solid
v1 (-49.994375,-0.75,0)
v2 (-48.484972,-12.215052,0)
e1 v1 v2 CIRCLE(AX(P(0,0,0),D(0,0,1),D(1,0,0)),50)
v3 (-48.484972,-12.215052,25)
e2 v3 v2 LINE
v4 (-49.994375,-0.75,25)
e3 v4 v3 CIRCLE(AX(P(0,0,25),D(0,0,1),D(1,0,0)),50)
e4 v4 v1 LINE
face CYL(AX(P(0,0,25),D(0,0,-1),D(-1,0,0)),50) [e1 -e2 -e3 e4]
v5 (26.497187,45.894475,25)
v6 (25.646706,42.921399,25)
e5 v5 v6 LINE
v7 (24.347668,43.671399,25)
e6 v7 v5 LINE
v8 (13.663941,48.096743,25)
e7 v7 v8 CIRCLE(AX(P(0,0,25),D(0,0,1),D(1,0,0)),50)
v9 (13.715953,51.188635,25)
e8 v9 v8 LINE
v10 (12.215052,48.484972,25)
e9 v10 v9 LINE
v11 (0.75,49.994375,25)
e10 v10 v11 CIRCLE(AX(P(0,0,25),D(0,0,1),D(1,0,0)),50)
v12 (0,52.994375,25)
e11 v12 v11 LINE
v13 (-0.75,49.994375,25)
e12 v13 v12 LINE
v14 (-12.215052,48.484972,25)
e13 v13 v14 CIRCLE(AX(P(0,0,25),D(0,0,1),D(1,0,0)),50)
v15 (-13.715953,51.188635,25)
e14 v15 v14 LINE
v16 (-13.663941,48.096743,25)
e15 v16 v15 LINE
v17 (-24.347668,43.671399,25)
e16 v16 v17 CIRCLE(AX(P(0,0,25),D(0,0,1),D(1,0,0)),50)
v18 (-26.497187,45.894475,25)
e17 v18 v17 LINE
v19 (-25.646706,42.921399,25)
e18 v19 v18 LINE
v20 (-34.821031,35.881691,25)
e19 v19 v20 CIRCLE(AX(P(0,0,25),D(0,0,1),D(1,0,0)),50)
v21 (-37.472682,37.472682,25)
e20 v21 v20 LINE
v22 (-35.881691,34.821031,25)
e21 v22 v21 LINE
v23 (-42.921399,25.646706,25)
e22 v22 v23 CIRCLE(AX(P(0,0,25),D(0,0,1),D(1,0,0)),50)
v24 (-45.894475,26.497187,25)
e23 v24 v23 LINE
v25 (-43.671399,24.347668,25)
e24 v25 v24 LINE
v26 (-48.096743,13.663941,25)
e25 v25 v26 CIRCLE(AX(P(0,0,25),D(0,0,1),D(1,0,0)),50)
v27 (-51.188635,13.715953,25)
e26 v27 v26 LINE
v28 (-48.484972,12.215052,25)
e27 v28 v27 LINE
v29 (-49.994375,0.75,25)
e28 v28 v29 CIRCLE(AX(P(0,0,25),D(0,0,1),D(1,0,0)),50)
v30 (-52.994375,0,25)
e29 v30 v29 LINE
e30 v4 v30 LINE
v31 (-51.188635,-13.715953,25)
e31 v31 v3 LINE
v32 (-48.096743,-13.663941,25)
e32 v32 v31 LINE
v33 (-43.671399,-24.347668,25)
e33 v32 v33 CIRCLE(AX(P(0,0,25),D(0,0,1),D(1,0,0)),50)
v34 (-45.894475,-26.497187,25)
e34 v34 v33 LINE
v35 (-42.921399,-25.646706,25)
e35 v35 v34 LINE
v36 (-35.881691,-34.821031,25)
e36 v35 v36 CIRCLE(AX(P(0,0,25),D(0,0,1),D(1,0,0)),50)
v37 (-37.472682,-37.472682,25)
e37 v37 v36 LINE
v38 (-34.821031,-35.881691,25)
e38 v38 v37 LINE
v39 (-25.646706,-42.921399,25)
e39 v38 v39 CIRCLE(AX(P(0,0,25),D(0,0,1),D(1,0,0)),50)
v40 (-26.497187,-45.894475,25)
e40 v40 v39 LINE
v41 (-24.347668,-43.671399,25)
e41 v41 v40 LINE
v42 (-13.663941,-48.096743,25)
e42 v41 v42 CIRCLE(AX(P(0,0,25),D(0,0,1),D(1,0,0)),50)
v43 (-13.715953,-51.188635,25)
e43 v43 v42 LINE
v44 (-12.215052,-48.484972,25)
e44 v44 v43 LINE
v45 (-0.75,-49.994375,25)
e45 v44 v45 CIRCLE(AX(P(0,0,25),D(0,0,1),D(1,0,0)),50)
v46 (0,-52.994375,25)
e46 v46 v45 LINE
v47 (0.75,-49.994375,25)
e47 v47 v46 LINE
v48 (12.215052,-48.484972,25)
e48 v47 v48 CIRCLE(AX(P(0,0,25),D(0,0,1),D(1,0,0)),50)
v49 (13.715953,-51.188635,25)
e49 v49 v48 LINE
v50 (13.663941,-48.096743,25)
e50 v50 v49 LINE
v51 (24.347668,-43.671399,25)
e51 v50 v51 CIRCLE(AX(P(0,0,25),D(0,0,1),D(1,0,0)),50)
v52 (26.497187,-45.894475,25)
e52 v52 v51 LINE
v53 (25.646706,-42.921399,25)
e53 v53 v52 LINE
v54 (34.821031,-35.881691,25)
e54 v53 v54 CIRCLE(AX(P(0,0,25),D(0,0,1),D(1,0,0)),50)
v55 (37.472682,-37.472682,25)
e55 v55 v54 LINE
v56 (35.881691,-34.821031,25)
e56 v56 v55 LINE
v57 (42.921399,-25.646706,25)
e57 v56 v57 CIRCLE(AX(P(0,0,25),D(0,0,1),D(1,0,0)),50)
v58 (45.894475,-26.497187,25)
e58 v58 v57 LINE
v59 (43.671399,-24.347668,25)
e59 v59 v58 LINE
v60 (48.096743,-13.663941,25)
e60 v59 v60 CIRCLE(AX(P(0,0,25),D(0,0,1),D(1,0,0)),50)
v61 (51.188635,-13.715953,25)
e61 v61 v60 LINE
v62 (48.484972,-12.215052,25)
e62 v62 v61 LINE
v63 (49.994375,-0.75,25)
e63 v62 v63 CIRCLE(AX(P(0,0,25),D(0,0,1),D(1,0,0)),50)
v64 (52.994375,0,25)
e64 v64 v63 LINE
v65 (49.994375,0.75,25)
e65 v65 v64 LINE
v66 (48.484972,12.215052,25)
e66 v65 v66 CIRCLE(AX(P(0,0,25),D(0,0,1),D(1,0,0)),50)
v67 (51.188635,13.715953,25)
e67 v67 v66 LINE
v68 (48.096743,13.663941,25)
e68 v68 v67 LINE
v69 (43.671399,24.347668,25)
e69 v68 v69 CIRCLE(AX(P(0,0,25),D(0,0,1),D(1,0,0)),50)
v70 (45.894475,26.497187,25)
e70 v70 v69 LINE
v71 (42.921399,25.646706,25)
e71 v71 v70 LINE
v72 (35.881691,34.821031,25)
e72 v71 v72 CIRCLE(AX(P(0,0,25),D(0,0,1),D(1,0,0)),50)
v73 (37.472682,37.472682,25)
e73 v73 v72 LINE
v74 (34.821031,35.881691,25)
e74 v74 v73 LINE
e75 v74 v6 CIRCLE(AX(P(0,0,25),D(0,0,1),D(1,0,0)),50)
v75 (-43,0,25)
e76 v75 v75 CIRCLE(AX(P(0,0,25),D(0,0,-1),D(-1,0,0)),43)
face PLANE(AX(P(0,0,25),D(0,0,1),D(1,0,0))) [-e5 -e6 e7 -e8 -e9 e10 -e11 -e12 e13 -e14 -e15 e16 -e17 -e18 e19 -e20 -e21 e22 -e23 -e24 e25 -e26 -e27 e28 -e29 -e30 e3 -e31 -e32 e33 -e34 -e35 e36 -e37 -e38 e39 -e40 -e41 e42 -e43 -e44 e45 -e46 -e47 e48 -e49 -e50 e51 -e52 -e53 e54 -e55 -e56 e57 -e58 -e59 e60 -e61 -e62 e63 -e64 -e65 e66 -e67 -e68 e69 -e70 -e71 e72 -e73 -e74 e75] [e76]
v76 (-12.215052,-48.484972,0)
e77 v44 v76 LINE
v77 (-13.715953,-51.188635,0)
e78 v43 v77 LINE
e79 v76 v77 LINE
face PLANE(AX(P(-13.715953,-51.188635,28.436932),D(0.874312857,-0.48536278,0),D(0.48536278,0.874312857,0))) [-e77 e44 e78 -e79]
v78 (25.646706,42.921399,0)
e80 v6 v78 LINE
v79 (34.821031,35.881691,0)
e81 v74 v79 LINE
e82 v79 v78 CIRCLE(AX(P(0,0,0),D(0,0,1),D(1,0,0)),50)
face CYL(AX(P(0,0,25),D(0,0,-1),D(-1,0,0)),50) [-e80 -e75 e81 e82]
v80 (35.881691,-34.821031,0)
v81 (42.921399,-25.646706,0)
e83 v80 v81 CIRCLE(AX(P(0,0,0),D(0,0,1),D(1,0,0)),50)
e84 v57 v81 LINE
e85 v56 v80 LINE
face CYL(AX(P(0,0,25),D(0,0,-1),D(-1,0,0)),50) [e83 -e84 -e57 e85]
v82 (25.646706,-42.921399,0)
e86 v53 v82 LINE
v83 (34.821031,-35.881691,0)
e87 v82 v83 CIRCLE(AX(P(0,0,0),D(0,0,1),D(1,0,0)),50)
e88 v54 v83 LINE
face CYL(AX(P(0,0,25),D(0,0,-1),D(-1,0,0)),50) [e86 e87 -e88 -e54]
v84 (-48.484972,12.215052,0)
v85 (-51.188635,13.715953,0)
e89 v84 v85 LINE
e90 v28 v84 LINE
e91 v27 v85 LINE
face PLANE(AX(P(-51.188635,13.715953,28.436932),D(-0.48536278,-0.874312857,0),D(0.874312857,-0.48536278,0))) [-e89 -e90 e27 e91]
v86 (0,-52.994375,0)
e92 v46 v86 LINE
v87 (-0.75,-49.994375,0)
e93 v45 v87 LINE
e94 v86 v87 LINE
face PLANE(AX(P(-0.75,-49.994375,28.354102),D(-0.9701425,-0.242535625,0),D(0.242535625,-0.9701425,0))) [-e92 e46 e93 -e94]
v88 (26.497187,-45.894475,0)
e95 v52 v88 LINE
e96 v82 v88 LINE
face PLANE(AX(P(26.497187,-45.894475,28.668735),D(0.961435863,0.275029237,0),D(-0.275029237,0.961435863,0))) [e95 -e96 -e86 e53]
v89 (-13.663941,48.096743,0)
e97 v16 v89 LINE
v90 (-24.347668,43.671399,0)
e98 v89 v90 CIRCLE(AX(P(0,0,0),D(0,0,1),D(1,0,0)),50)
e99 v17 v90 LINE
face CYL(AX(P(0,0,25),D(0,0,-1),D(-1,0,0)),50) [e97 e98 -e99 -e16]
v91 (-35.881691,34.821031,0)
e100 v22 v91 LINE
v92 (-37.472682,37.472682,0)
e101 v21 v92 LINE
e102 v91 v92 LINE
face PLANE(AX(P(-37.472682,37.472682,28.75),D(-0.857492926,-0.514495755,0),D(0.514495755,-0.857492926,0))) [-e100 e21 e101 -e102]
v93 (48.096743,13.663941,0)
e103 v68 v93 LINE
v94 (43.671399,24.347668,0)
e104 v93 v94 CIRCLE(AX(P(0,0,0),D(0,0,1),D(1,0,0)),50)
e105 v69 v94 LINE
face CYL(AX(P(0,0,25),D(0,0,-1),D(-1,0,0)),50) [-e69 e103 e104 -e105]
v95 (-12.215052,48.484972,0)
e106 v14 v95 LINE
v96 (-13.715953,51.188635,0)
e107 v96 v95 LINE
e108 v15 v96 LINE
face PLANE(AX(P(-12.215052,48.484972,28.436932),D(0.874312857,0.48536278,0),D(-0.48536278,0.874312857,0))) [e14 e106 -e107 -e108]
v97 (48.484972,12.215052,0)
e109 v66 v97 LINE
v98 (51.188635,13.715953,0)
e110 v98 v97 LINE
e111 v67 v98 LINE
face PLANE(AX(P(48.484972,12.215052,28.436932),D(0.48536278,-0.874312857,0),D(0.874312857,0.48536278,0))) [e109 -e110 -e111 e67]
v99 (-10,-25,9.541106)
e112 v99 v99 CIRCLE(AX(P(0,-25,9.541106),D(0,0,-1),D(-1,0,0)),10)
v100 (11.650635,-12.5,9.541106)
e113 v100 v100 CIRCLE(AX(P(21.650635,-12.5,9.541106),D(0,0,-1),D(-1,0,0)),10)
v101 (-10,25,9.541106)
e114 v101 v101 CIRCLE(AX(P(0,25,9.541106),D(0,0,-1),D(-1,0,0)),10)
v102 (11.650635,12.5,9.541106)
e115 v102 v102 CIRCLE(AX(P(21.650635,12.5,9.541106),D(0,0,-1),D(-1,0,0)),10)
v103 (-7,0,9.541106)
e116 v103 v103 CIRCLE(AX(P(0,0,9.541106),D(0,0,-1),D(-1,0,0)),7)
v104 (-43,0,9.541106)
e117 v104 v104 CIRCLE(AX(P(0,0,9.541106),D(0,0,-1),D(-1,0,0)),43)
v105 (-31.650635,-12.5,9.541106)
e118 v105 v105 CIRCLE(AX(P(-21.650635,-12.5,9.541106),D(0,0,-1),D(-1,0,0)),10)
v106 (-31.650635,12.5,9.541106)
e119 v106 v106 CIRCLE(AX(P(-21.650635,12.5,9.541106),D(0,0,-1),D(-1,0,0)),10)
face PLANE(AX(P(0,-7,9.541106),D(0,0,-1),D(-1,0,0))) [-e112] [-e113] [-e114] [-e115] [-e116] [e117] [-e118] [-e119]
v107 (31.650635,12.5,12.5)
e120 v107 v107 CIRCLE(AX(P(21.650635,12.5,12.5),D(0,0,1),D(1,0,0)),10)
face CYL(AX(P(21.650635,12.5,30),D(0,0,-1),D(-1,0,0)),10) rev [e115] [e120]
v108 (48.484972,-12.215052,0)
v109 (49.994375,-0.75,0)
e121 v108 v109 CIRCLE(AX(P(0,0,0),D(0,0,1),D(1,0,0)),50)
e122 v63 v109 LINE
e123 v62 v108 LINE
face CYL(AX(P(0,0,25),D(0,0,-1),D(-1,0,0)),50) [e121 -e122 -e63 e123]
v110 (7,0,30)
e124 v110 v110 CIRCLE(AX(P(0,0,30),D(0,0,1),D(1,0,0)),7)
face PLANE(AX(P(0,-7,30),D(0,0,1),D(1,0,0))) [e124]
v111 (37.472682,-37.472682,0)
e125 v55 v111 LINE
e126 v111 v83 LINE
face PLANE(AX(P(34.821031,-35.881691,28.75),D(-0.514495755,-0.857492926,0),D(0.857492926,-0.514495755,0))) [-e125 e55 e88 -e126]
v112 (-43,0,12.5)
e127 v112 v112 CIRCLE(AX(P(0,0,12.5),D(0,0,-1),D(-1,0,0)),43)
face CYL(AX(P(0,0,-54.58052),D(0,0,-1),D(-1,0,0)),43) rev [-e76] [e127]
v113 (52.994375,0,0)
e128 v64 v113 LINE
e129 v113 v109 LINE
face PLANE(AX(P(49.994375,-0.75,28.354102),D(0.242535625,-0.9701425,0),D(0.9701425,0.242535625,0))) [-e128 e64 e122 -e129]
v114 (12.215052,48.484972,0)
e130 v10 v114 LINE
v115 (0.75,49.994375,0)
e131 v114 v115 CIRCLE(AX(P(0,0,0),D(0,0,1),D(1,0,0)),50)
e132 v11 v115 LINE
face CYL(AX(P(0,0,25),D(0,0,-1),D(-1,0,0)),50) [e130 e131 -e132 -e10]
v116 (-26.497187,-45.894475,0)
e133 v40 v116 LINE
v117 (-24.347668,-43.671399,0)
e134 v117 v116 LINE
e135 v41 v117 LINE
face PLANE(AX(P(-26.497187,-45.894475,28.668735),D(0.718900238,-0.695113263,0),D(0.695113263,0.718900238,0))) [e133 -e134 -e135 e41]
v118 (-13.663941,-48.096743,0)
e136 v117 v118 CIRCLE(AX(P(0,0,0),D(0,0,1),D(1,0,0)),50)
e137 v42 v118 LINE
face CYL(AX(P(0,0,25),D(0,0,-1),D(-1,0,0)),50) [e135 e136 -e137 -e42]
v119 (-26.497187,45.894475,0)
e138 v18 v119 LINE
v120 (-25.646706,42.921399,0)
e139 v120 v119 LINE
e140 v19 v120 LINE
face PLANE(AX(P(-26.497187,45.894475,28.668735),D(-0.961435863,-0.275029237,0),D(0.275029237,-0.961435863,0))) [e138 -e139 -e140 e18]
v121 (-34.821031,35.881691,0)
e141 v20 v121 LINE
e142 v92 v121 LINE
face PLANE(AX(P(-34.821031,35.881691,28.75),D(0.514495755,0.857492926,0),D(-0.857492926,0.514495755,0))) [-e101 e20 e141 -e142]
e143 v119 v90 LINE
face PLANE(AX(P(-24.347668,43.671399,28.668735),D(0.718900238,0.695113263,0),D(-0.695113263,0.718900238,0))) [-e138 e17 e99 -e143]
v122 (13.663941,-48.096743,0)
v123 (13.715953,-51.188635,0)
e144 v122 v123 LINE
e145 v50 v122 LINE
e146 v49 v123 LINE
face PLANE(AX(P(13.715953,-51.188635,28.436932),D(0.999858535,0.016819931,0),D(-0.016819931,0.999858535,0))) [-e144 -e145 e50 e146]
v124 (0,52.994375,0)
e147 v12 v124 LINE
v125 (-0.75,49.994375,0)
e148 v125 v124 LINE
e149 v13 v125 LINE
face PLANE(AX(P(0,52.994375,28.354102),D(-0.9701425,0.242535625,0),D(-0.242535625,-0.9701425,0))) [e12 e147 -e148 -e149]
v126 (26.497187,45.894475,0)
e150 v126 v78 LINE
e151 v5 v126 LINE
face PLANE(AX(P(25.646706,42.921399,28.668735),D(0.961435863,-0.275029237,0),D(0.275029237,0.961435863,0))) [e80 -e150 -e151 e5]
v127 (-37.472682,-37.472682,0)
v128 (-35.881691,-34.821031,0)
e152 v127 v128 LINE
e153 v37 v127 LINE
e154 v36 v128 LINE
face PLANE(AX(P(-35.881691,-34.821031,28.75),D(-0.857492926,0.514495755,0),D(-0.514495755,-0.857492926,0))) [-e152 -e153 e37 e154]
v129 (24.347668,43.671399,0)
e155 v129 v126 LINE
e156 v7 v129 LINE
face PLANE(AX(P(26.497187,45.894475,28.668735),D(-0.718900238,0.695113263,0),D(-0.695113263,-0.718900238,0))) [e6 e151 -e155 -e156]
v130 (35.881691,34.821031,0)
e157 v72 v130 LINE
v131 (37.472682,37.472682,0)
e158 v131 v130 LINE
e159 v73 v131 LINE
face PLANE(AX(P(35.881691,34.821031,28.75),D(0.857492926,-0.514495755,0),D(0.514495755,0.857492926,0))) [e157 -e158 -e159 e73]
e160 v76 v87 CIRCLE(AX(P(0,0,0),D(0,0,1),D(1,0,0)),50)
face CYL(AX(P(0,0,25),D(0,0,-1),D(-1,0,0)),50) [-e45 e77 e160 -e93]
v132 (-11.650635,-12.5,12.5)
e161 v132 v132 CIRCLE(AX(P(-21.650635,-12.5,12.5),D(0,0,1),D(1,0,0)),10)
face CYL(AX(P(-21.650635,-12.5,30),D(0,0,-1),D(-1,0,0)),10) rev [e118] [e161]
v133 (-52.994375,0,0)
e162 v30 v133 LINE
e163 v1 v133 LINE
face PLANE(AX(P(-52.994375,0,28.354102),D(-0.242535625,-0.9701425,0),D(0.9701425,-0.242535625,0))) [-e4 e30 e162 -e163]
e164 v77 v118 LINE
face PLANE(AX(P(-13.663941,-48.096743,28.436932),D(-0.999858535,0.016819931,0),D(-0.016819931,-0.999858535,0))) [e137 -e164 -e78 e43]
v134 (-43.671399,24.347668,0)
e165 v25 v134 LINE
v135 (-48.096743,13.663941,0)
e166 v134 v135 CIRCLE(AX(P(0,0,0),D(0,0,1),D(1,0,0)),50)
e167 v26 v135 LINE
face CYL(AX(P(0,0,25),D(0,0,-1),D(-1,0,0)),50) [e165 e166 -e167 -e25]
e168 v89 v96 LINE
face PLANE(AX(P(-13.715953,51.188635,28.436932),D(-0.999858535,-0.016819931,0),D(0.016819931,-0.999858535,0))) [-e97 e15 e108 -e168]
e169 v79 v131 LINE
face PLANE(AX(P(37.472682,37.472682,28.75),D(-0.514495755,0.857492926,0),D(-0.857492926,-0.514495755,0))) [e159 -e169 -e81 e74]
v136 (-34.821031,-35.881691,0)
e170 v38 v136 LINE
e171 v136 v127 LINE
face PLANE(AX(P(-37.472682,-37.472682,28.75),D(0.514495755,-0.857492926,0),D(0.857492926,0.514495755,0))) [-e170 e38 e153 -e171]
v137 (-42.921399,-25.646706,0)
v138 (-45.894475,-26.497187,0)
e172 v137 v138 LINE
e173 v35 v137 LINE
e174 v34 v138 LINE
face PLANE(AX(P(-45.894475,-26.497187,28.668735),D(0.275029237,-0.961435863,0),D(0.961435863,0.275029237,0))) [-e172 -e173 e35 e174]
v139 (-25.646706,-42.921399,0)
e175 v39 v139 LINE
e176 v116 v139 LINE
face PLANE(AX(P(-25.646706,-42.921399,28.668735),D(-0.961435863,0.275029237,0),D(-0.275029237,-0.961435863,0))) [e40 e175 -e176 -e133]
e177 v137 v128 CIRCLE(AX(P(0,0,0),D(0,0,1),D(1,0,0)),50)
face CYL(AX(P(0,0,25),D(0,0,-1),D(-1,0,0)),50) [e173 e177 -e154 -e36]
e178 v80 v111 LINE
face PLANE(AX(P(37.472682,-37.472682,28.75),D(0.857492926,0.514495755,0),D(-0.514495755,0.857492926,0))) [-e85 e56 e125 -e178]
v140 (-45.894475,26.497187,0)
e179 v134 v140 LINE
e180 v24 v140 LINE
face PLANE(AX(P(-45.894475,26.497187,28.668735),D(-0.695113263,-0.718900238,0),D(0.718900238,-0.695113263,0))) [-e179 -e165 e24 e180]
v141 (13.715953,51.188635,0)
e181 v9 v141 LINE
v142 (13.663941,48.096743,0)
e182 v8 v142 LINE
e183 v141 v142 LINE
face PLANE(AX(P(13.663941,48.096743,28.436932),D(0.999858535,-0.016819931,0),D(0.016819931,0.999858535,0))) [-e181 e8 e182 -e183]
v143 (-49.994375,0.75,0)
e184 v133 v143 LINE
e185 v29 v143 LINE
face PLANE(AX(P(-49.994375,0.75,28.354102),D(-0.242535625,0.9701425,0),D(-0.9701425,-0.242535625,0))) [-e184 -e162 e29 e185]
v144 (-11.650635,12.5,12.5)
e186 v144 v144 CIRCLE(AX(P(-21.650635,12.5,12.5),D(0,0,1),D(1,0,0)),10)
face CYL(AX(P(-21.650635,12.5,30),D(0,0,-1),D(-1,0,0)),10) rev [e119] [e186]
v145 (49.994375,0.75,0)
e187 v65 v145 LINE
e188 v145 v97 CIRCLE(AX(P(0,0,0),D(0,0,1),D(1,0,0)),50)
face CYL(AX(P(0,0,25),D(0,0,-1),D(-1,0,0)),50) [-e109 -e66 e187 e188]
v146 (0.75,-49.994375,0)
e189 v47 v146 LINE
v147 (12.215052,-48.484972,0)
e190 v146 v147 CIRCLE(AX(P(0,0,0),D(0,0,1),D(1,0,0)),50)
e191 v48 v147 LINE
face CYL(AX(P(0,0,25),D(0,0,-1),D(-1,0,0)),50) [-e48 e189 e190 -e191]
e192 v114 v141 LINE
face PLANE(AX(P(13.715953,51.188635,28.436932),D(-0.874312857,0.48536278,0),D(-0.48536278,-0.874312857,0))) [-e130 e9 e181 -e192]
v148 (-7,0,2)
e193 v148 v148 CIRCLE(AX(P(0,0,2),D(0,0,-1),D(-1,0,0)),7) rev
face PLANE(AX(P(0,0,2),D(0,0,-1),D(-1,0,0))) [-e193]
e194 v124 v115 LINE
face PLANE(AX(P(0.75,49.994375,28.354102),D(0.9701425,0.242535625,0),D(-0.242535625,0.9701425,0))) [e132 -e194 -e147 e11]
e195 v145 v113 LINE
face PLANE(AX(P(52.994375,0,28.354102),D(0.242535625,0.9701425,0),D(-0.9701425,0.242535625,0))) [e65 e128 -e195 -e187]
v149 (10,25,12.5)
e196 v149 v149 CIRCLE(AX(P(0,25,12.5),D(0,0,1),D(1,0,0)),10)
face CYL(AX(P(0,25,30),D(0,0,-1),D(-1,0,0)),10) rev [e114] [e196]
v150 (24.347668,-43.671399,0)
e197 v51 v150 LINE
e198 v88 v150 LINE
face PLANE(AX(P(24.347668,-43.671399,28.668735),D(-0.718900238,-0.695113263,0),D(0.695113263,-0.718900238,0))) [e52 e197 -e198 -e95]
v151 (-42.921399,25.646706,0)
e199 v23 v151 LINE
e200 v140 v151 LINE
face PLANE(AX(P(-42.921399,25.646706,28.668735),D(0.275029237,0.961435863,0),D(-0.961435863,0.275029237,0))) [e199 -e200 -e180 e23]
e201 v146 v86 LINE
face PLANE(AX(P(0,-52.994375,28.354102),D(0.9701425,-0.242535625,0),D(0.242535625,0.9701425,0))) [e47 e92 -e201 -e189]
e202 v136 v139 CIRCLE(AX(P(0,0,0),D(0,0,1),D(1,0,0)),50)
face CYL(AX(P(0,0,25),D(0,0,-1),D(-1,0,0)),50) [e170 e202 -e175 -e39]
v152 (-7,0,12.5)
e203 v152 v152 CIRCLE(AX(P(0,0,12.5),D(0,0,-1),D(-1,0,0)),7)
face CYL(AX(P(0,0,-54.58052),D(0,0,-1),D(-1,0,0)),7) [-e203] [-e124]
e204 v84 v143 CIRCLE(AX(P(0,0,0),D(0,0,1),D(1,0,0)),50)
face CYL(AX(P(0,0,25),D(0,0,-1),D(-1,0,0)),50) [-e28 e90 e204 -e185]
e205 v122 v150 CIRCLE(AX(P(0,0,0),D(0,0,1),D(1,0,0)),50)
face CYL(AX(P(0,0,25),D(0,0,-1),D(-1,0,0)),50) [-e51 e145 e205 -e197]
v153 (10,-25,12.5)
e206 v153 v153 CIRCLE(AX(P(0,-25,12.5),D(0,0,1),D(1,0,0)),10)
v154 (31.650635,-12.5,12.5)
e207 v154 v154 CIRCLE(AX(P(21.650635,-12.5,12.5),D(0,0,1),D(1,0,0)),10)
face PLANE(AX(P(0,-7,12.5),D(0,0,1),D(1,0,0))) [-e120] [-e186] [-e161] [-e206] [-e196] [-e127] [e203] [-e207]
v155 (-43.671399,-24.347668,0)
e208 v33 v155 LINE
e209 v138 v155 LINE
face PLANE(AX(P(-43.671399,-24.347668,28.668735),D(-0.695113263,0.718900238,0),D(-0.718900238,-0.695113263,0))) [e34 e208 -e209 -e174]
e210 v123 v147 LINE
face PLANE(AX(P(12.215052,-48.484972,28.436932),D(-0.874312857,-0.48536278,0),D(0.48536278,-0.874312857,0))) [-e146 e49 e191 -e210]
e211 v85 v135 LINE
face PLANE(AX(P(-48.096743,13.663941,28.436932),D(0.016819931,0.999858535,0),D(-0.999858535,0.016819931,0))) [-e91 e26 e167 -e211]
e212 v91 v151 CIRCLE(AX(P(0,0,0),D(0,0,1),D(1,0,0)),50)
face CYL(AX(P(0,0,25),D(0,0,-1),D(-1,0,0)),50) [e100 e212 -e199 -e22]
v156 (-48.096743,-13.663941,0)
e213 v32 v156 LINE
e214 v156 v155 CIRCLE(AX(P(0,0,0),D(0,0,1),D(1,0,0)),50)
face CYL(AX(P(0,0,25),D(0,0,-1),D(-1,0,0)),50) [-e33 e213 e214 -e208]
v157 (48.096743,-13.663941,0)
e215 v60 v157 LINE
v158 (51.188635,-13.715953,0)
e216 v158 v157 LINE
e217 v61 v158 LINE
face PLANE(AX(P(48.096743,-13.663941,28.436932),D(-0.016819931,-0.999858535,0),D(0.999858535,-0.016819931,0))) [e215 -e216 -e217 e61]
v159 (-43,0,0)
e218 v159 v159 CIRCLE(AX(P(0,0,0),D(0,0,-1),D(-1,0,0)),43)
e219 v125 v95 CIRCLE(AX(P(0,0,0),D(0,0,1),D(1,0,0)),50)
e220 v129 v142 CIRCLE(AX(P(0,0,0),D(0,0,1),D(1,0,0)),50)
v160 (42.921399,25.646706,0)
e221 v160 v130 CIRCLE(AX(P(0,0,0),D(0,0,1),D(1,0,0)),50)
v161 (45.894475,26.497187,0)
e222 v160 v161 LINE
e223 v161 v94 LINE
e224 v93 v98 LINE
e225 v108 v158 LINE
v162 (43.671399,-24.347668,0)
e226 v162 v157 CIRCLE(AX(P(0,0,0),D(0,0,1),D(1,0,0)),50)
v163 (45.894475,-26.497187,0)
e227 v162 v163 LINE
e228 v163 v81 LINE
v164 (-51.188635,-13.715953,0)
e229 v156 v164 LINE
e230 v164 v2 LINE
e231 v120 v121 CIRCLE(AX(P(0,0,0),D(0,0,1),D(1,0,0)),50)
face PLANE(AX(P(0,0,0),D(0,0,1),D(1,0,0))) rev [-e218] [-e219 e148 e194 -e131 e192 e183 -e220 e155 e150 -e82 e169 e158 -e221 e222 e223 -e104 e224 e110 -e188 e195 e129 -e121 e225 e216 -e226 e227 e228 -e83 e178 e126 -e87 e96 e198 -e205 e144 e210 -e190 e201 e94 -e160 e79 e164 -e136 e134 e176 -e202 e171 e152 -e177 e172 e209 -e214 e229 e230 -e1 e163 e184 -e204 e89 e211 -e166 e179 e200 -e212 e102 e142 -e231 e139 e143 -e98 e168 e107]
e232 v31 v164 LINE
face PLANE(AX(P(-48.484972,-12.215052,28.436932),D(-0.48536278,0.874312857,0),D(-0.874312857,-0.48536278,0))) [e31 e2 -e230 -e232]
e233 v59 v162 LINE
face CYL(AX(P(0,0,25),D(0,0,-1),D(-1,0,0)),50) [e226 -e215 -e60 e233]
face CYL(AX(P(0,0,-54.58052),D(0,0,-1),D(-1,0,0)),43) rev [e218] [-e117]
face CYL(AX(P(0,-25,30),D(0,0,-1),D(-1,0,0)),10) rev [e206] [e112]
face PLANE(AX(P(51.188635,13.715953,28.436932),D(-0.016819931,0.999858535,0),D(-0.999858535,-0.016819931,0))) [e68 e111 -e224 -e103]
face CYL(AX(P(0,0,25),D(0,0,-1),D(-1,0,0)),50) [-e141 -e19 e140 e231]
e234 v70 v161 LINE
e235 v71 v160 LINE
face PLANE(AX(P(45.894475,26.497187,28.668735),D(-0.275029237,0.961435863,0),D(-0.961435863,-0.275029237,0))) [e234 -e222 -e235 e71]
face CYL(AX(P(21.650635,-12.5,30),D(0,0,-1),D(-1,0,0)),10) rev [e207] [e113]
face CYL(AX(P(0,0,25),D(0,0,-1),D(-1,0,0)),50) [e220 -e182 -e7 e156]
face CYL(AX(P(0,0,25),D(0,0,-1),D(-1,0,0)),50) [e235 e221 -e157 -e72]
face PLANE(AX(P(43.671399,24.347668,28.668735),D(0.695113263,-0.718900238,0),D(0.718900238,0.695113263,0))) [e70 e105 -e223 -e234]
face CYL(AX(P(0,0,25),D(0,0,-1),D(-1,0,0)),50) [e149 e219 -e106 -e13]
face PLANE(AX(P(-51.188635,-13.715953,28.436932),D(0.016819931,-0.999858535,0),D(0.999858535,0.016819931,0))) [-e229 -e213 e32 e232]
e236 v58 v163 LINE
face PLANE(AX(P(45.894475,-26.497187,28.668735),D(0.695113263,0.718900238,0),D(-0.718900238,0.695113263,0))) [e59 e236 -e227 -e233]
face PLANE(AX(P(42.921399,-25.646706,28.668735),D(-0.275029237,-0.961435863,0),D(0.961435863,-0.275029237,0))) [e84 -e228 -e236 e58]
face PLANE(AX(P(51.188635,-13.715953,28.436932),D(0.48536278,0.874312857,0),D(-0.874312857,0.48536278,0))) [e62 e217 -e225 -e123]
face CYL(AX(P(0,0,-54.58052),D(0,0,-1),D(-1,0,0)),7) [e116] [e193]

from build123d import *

# Parameters (mm, degrees)
SKETCH1_R           = 50
BOSS_EXTRUDE1_DEPTH = 25
SKETCH2_W           = 9.541105513
SKETCH2_H           = 36
SKETCH2_W_2         = 12.5
SKETCH2_4_W         = 9.541105513
SKETCH2_4_H         = 36
SKETCH2_4_W_2       = 12.5
SKETCH5_W           = 5
SKETCH5_H           = 7
SKETCH6_W           = 2
SKETCH6_H           = 9
SKETCH7_R           = 10
CUT_EXTRUDE1_DEPTH  = 74.610911988
BOSS_EXTRUDE2_DEPTH = 25
CIRPATTERN1_DEPTH   = 25


# Read off the part's stored shape, not the designer's step: CirPattern1
with BuildPart() as part:
    # Sketch1 → Boss-Extrude1 (new body)
    with BuildSketch(Plane.XY):
        Circle(SKETCH1_R)
    extrude(amount=BOSS_EXTRUDE1_DEPTH)

    # Sketch2 → Revolve1 (revolve)
    with BuildSketch(Plane(origin=(0, 0, 0), x_dir=(0, 0, -1), z_dir=(1, 0, 0))):
        with Locations((-4.770552756, -25)):
            Rectangle(SKETCH2_W, SKETCH2_H)
        with Locations((-18.75, -25)):
            Rectangle(SKETCH2_W_2, SKETCH2_H)
    revolve(axis=Axis((0, 0, -54.580519766), (0, 0, 1)))

    # Sketch2<4> → Cut-Revolve1 (revolve, cut)
    with BuildSketch(Plane(origin=(0, 0, 0), x_dir=(0, 0, -1), z_dir=(1, 0, 0)), mode=Mode.PRIVATE) as cut_revolve1_sk:
        with Locations((-4.770552756, -25)):
            Rectangle(SKETCH2_4_W, SKETCH2_4_H)
        with Locations((-18.75, -25)):
            Rectangle(SKETCH2_4_W_2, SKETCH2_4_H)
    revolve(cut_revolve1_sk.sketch.rotate(Axis((0, 0, -54.580519766), (0, 0, 1)), 270), axis=Axis((0, 0, -54.580519766), (0, 0, 1)), mode=Mode.SUBTRACT)

    # Sketch5 → Revolve3 (revolve)
    with BuildSketch(Plane(origin=(0, 0, 0), x_dir=(0, 0, -1), z_dir=(1, 0, 0)), mode=Mode.PRIVATE) as revolve3_sk:
        with Locations((-27.5, -3.5)):
            Rectangle(SKETCH5_W, SKETCH5_H)
    revolve(revolve3_sk.sketch.rotate(Axis((0, 0, 64.707463348), (0, 0, -1)), 90), axis=Axis((0, 0, 64.707463348), (0, 0, -1)))

    # Sketch6 → Cut-Revolve2 (revolve, cut)
    with BuildSketch(Plane(origin=(0, 0, 0), x_dir=(0, 0, -1), z_dir=(1, 0, 0)), mode=Mode.PRIVATE) as cut_revolve2_sk:
        with Locations((-1, -4.5)):
            Rectangle(SKETCH6_W, SKETCH6_H)
    revolve(cut_revolve2_sk.sketch.rotate(Axis((0, 0, -41.001610393), (0, 0, 1)), 270), axis=Axis((0, 0, -41.001610393), (0, 0, 1)), mode=Mode.SUBTRACT)

    # Sketch7 → Cut-Extrude1 (cut, through all)
    with BuildSketch(Plane(origin=(0, 0, 9.541105513), x_dir=(-1, 0, 0), z_dir=(0, 0, -1))):
        with Locations((0, 25)):
            Circle(SKETCH7_R)
        with Locations((21.650635095, 12.5)):
            Circle(SKETCH7_R)
        with Locations((21.650635095, -12.5)):
            Circle(SKETCH7_R)
        with Locations((0, -25)):
            Circle(SKETCH7_R)
        with Locations((-21.650635095, -12.5)):
            Circle(SKETCH7_R)
        with Locations((-21.650635095, 12.5)):
            Circle(SKETCH7_R)
    extrude(amount=-CUT_EXTRUDE1_DEPTH, mode=Mode.SUBTRACT)

    # Sketch8 → Boss-Extrude2 (add)
    with BuildSketch(Plane(origin=(0, 0, 0), x_dir=(-1, 0, 0), z_dir=(0, 0, -1))):
        with BuildLine():
            Line((-0.75, 49.994374684), (0, 52.994374684))
            Line((0, 52.994374684), (0.75, 49.994374684))
            ThreePointArc((0.75, 49.994374684), (0, 50), (-0.75, 49.994374684))
        make_face()
    extrude(amount=-BOSS_EXTRUDE2_DEPTH)

    # CirPattern1 outline → CirPattern1 (add)
    with BuildSketch(Plane.XY):
        with BuildLine():
            Line((-12.215051946, 48.48497196), (-13.715953451, 51.188635155))
            Line((-13.715953451, 51.188635155), (-13.663940686, 48.096743393))
            ThreePointArc((-13.663940686, 48.096743393), (-12.940952255, 48.296291315), (-12.215051946, 48.48497196))
        make_face()
        with BuildLine():
            ThreePointArc((12.215051946, 48.48497196), (12.940952255, 48.296291315), (13.663940686, 48.096743393))
            Line((13.663940686, 48.096743393), (13.715953451, 51.188635155))
            Line((13.715953451, 51.188635155), (12.215051946, 48.48497196))
        make_face()
        with BuildLine():
            ThreePointArc((24.347668289, 43.671398523), (25, 43.301270189), (25.646706395, 42.921398522))
            Line((25.646706395, 42.921398522), (26.497187342, 45.894474734))
            Line((26.497187342, 45.894474734), (24.347668289, 43.671398523))
        make_face()
        with BuildLine():
            ThreePointArc((34.821031274, 35.881691446), (35.35533906, 35.35533906), (35.881691446, 34.821031274))
            Line((35.881691446, 34.821031274), (37.472681703, 37.472681703))
            Line((37.472681703, 37.472681703), (34.821031274, 35.881691446))
        make_face()
        with BuildLine():
            ThreePointArc((42.921398522, 25.646706395), (43.301270189, 25), (43.671398522, 24.347668289))
            Line((43.671398522, 24.347668289), (45.894474734, 26.497187342))
            Line((45.894474734, 26.497187342), (42.921398522, 25.646706395))
        make_face()
        with BuildLine():
            ThreePointArc((48.096743392, 13.663940686), (48.296291315, 12.940952255), (48.48497196, 12.215051946))
            Line((48.48497196, 12.215051946), (51.188635155, 13.715953451))
            Line((51.188635155, 13.715953451), (48.096743392, 13.663940686))
        make_face()
        with BuildLine():
            ThreePointArc((49.994374684, 0.75), (50, 0), (49.994374684, -0.75))
            Line((49.994374684, -0.75), (52.994374684, 0))
            Line((52.994374684, 0), (49.994374684, 0.75))
        make_face()
        with BuildLine():
            ThreePointArc((48.48497196, -12.215051946), (48.296291315, -12.940952255), (48.096743392, -13.663940686))
            Line((48.096743392, -13.663940686), (51.188635155, -13.715953451))
            Line((51.188635155, -13.715953451), (48.48497196, -12.215051946))
        make_face()
        with BuildLine():
            ThreePointArc((43.671398522, -24.347668289), (43.301270189, -25), (42.921398522, -25.646706395))
            Line((42.921398522, -25.646706395), (45.894474734, -26.497187342))
            Line((45.894474734, -26.497187342), (43.671398522, -24.347668289))
        make_face()
        with BuildLine():
            ThreePointArc((35.881691446, -34.821031274), (35.355339059, -35.355339059), (34.821031274, -35.881691446))
            Line((34.821031274, -35.881691446), (37.472681703, -37.472681703))
            Line((37.472681703, -37.472681703), (35.881691446, -34.821031274))
        make_face()
        with BuildLine():
            ThreePointArc((25.646706395, -42.921398522), (25, -43.301270189), (24.347668289, -43.671398522))
            Line((24.347668289, -43.671398522), (26.497187342, -45.894474734))
            Line((26.497187342, -45.894474734), (25.646706395, -42.921398522))
        make_face()
        with BuildLine():
            ThreePointArc((13.663940686, -48.096743392), (12.940952255, -48.296291314), (12.215051946, -48.48497196))
            Line((12.215051946, -48.48497196), (13.715953451, -51.188635155))
            Line((13.715953451, -51.188635155), (13.663940686, -48.096743392))
        make_face()
        with BuildLine():
            ThreePointArc((0.75, -49.994374684), (0, -50), (-0.75, -49.994374684))
            Line((-0.75, -49.994374684), (0, -52.994374684))
            Line((0, -52.994374684), (0.75, -49.994374684))
        make_face()
        with BuildLine():
            ThreePointArc((-12.215051946, -48.48497196), (-12.940952255, -48.296291314), (-13.663940686, -48.096743392))
            Line((-13.663940686, -48.096743392), (-13.715953451, -51.188635155))
            Line((-13.715953451, -51.188635155), (-12.215051946, -48.48497196))
        make_face()
        with BuildLine():
            ThreePointArc((-24.347668289, -43.671398522), (-25, -43.301270189), (-25.646706395, -42.921398522))
            Line((-25.646706395, -42.921398522), (-26.497187342, -45.894474734))
            Line((-26.497187342, -45.894474734), (-24.347668289, -43.671398522))
        make_face()
        with BuildLine():
            ThreePointArc((-34.821031274, -35.881691446), (-35.355339059, -35.355339059), (-35.881691446, -34.821031274))
            Line((-35.881691446, -34.821031274), (-37.472681703, -37.472681703))
            Line((-37.472681703, -37.472681703), (-34.821031274, -35.881691446))
        make_face()
        with BuildLine():
            ThreePointArc((-42.921398522, -25.646706395), (-43.301270189, -25), (-43.671398522, -24.347668289))
            Line((-43.671398522, -24.347668289), (-45.894474734, -26.497187342))
            Line((-45.894474734, -26.497187342), (-42.921398522, -25.646706395))
        make_face()
        with BuildLine():
            ThreePointArc((-48.096743392, -13.663940686), (-48.296291315, -12.940952255), (-48.48497196, -12.215051946))
            Line((-48.48497196, -12.215051946), (-51.188635155, -13.715953451))
            Line((-51.188635155, -13.715953451), (-48.096743392, -13.663940686))
        make_face()
        with BuildLine():
            ThreePointArc((-49.994374684, -0.75), (-50, 0), (-49.994374684, 0.75))
            Line((-49.994374684, 0.75), (-52.994374684, 0))
            Line((-52.994374684, 0), (-49.994374684, -0.75))
        make_face()
        with BuildLine():
            ThreePointArc((-48.48497196, 12.215051946), (-48.296291315, 12.940952255), (-48.096743392, 13.663940686))
            Line((-48.096743392, 13.663940686), (-51.188635155, 13.715953451))
            Line((-51.188635155, 13.715953451), (-48.48497196, 12.215051946))
        make_face()
        with BuildLine():
            ThreePointArc((-43.671398522, 24.347668289), (-43.301270189, 25), (-42.921398522, 25.646706395))
            Line((-42.921398522, 25.646706395), (-45.894474734, 26.497187342))
            Line((-45.894474734, 26.497187342), (-43.671398522, 24.347668289))
        make_face()
        with BuildLine():
            ThreePointArc((-35.881691446, 34.821031274), (-35.35533906, 35.35533906), (-34.821031274, 35.881691446))
            Line((-34.821031274, 35.881691446), (-37.472681703, 37.472681703))
            Line((-37.472681703, 37.472681703), (-35.881691446, 34.821031274))
        make_face()
        with BuildLine():
            ThreePointArc((-25.646706395, 42.921398522), (-25, 43.301270189), (-24.347668289, 43.671398523))
            Line((-24.347668289, 43.671398523), (-26.497187342, 45.894474734))
            Line((-26.497187342, 45.894474734), (-25.646706395, 42.921398522))
        make_face()
    extrude(amount=CIRPATTERN1_DEPTH)


solid = part.part
